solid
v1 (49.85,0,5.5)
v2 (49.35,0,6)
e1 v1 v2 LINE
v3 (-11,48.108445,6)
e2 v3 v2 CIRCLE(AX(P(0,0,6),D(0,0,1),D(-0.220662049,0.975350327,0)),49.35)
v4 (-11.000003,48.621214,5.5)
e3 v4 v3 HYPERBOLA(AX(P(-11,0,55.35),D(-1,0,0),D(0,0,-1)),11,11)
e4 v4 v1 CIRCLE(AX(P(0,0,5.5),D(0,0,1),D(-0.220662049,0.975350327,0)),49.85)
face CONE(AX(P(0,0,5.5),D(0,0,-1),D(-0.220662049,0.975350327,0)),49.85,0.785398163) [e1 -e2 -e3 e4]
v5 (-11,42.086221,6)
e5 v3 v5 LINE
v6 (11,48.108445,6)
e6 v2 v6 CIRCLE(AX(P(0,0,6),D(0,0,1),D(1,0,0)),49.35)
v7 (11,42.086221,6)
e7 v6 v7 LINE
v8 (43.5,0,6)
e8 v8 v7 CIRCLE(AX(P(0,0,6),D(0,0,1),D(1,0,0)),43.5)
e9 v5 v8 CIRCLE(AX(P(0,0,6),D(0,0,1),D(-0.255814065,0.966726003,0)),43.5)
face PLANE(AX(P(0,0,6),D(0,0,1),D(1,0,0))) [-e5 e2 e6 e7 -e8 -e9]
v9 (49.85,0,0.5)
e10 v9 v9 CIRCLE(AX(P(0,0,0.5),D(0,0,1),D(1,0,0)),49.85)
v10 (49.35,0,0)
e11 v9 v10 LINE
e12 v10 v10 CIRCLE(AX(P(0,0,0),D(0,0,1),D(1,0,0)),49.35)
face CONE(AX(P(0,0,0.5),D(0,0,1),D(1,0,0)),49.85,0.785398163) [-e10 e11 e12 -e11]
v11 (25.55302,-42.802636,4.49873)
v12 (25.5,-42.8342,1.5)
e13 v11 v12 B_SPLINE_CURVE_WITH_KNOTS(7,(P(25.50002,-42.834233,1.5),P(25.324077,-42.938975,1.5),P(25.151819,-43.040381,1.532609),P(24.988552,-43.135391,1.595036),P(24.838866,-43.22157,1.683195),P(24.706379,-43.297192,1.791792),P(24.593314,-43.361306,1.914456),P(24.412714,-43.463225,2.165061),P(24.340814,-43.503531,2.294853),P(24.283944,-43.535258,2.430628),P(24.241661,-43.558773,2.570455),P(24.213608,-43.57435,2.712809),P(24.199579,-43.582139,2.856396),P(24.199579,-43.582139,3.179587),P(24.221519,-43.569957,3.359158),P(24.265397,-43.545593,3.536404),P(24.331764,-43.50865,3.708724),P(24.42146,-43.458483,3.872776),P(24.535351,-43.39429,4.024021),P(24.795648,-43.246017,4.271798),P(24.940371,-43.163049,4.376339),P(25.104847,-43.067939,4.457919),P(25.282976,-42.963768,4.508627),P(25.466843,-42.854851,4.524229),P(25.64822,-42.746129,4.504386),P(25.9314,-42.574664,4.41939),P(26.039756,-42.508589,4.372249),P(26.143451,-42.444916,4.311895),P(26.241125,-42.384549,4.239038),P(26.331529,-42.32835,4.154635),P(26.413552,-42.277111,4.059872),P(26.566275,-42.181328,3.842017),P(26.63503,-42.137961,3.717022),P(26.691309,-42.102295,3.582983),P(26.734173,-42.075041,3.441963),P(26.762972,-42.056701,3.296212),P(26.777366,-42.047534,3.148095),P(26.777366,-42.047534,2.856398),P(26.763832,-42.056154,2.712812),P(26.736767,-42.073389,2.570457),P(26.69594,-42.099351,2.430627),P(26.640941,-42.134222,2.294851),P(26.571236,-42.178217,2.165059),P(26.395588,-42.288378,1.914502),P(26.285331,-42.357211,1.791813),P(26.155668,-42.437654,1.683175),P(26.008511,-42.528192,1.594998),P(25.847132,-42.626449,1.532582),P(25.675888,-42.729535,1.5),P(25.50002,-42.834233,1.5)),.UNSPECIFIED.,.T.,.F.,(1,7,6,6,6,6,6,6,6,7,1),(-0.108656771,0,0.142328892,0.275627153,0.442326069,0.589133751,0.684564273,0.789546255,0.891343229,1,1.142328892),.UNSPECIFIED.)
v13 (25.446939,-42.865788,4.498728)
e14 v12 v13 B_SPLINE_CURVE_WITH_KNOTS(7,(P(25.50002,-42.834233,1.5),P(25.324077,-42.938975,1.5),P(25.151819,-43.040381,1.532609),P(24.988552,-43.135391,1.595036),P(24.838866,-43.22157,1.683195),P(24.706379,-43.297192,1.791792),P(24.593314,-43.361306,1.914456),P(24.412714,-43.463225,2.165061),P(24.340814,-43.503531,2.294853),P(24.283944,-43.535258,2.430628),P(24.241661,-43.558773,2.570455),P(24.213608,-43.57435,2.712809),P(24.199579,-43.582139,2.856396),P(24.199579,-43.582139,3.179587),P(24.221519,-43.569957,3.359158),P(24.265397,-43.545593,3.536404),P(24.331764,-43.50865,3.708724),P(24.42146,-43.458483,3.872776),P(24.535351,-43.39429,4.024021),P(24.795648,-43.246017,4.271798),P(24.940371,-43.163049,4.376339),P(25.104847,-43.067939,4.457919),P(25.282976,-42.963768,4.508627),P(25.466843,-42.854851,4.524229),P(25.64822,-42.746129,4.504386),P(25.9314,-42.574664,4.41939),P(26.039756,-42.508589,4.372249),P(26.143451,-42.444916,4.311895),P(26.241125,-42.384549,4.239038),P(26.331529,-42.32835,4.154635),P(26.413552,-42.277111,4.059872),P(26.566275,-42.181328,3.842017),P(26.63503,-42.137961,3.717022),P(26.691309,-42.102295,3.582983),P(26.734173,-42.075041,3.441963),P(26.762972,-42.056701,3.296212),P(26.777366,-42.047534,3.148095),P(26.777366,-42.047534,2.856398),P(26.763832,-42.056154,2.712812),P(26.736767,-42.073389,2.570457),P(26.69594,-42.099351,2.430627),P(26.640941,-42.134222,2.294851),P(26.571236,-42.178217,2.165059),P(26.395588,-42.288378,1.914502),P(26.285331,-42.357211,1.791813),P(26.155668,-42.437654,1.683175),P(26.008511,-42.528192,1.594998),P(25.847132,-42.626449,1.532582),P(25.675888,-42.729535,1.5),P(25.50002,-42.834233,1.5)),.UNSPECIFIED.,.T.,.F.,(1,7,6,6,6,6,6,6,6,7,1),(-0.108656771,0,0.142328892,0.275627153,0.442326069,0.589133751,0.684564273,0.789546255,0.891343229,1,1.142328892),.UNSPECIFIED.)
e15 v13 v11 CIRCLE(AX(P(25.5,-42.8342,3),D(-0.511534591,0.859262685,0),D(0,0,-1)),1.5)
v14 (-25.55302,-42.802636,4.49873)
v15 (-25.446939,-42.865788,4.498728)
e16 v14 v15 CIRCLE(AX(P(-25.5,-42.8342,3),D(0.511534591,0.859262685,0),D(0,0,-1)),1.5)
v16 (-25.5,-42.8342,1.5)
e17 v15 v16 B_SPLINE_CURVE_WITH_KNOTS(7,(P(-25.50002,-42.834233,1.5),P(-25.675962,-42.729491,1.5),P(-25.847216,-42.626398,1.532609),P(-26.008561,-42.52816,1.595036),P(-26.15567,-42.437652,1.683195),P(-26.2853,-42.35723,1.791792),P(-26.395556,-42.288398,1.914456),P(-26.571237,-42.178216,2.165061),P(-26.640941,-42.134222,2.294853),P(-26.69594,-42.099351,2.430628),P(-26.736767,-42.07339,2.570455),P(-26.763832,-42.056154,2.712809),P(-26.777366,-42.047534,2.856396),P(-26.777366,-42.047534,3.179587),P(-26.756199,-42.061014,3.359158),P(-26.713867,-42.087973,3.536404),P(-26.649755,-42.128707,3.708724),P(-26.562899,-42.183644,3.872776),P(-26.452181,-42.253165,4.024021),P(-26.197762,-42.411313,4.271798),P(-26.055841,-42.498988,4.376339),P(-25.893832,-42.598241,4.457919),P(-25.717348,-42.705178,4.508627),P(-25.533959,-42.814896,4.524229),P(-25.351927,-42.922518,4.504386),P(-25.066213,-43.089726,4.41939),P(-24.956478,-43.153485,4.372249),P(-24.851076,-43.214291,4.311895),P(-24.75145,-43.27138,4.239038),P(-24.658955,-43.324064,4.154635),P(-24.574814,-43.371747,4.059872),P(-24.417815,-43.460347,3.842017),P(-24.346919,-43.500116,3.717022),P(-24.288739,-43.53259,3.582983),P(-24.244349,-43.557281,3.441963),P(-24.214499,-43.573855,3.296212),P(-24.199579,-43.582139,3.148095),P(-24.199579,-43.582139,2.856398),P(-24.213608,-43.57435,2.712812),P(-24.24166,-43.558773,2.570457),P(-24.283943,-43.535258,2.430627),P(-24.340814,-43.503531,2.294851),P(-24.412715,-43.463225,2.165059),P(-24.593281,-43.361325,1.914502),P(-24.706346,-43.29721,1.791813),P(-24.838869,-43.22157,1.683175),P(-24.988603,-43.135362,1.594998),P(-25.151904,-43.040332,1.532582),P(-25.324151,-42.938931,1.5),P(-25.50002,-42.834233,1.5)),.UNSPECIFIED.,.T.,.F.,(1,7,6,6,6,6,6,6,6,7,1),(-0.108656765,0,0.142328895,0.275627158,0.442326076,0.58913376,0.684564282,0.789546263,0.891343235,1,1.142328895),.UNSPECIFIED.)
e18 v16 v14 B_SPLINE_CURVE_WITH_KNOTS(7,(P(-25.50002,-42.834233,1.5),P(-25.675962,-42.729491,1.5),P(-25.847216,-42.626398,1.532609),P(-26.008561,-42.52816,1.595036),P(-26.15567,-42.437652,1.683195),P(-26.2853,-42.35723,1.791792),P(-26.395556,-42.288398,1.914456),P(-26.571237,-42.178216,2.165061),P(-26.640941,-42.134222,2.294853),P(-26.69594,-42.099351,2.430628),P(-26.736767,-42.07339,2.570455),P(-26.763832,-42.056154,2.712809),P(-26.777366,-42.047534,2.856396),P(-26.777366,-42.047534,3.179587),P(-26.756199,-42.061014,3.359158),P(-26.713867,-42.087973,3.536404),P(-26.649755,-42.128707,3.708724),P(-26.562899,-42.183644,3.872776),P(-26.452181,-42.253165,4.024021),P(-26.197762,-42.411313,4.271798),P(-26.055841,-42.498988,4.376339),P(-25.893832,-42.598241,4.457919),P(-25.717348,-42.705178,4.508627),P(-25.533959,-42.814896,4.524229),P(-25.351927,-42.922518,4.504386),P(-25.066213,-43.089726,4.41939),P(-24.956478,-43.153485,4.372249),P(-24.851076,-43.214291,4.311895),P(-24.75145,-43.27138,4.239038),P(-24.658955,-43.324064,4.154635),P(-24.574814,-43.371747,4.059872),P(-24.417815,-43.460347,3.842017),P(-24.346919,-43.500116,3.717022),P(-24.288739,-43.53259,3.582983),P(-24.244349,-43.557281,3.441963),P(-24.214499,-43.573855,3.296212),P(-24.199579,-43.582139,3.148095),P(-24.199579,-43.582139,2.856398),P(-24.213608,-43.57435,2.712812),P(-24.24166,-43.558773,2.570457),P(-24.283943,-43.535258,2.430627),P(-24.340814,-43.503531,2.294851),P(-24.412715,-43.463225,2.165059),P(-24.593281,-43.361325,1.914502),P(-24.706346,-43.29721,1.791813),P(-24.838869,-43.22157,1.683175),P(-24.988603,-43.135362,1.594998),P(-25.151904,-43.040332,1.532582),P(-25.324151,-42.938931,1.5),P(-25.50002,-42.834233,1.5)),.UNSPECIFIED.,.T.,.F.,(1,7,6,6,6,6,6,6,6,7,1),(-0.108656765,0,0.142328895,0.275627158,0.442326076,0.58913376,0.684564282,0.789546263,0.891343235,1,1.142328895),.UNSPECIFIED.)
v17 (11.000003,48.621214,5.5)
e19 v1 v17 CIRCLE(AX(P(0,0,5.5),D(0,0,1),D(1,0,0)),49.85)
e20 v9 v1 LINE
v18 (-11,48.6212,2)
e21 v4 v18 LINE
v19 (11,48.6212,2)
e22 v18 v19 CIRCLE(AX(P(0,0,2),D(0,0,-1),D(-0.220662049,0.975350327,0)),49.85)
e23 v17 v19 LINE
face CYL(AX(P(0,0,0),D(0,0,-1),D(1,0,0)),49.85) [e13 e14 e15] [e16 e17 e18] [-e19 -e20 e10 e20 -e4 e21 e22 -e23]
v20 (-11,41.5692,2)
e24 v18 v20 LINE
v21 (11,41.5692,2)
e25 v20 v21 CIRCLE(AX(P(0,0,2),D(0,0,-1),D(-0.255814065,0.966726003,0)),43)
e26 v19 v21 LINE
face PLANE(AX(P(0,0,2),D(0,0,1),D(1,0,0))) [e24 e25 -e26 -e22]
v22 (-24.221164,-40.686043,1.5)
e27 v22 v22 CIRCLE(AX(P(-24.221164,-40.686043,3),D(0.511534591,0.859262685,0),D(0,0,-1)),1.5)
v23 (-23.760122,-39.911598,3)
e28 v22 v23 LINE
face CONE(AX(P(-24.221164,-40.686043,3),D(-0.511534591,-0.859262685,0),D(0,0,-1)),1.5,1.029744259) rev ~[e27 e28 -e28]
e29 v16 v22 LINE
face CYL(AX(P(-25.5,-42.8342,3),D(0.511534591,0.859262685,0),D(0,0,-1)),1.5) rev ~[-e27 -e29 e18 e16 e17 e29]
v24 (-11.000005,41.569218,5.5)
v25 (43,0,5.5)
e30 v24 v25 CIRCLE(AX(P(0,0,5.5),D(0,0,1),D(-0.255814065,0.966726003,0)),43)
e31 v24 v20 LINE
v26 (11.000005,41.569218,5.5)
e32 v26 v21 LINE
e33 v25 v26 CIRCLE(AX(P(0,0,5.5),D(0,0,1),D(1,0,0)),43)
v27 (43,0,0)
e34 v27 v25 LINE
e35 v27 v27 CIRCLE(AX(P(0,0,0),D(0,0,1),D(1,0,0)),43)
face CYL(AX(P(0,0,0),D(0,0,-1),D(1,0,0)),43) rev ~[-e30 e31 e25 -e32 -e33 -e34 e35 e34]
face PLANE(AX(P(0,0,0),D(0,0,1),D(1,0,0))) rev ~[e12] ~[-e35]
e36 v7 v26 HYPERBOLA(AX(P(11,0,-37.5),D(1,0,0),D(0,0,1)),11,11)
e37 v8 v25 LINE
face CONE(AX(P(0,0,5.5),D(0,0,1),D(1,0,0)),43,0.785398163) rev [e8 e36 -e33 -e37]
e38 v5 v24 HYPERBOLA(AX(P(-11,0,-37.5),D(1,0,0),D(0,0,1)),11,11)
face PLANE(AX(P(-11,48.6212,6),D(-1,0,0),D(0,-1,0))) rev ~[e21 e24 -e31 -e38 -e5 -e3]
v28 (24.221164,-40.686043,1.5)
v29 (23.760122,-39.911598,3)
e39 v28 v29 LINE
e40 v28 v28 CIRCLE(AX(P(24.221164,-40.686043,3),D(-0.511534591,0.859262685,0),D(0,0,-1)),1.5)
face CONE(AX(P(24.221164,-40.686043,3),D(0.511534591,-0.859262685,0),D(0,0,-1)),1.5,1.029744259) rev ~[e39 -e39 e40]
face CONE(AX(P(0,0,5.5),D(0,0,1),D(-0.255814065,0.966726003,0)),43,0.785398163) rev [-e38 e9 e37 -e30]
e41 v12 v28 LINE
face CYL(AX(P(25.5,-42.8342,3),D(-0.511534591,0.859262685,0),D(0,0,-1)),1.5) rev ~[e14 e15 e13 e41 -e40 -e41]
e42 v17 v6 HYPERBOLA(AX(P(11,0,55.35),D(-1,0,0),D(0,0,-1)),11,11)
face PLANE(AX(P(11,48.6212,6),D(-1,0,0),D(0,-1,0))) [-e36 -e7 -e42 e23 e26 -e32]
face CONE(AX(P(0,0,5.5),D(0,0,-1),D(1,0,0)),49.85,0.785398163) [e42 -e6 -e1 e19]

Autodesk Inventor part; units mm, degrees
sketch "草圖1" plane through (0, 0, 0) normal (0, 0, 1) x (1, 0, 0)
  circle A0 centre (0, 0) radius 49.85
  circle A1 centre (0, 0) radius 43
  dimension "d0" = 99.7
  dimension "d3" = 86
extrude "擠出1" add sketch "草圖1" along normal blind 6
sketch "草圖2" plane through (0, 0, 6) normal (0, 0, 1) x (1, 0, 0)
  circle A0 centre (0, 0) radius 43 projected
  circle A1 centre (0, 0) radius 49.85 projected
  line L0 (0, 0) -> (0, 49.85)
  line L1 (11, 48.6212) -> (11, 41.5692)
  line L2 (-11, 48.6212) -> (-11, 41.5692)
  dimension "d6" = 22
extrude "擠出2" cut sketch "草圖2" against normal blind 4 contours A0 L0 A1 L1 | L2 A1 L0 A0
ref_plane "工作平面1" through (0, 0, 3) normal (0, 0, 1) x (1, 0, 0)
sketch "草圖3" plane through (0, 0, 3) normal (0, 0, 1) x (1, 0, 0)
  line L0 (0, 0) -> (0, -42.4806)
  line L1 (0, 0) -> (-25.5, -42.8342)
  line L2 (0, 0) -> (25.5, -42.8342)
  arc A0 (-11, 48.6212) -> (11, 48.6212) centre (0, 0) ccw projected
  line L3 (-25.5, -42.8342) -> (25.5, -42.8342)
  dimension "d9" = 51
  dimension "d27" = 61.532
  dimension "d28" = 30.766
  dimension "d29" = 30.766
ref_plane "工作平面2" through (25.5, -42.8342, 3) normal (0.5115346, -0.8592627, 0) x (0.8592627, 0.5115346, 0)
ref_plane "工作平面3" through (-25.5, -42.8342, 3) normal (-0.5115346, -0.8592627, 0) x (0.8592627, -0.5115346, 0)
sketch "草圖4" plane through (25.5, -42.8342, 3) normal (0.5115346, -0.8592627, 0) x (0.8592627, 0.5115346, 0)
  point P0 (0, -3)
  point P1 (0, 0)
hole "孔1" at (25.5, -42.8342, 3) direction (-0.5115346, 0.8592627, 0) diameter 3 depth 2.5 tip angle 118
sketch "草圖5" plane through (-25.5, -42.8342, 3) normal (-0.5115346, -0.8592627, 0) x (0.8592627, -0.5115346, 0)
  point P0 (0, -3)
  point P1 (0, 0)
hole "孔2" at (-25.5, -42.8342, 3) direction (0.5115346, 0.8592627, 0) diameter 3 depth 2.5 tip angle 118
chamfer "倒角1" distance 0.5 angle 45 5 edges at (-26.2298, -34.0735, 6) (34.0735, 26.2298, 6) (-49.85, 0, 0) (-31.1181, -38.9447, 6) (38.9447, 31.1181, 6)
properties part number "KE-SP-02-P1"
